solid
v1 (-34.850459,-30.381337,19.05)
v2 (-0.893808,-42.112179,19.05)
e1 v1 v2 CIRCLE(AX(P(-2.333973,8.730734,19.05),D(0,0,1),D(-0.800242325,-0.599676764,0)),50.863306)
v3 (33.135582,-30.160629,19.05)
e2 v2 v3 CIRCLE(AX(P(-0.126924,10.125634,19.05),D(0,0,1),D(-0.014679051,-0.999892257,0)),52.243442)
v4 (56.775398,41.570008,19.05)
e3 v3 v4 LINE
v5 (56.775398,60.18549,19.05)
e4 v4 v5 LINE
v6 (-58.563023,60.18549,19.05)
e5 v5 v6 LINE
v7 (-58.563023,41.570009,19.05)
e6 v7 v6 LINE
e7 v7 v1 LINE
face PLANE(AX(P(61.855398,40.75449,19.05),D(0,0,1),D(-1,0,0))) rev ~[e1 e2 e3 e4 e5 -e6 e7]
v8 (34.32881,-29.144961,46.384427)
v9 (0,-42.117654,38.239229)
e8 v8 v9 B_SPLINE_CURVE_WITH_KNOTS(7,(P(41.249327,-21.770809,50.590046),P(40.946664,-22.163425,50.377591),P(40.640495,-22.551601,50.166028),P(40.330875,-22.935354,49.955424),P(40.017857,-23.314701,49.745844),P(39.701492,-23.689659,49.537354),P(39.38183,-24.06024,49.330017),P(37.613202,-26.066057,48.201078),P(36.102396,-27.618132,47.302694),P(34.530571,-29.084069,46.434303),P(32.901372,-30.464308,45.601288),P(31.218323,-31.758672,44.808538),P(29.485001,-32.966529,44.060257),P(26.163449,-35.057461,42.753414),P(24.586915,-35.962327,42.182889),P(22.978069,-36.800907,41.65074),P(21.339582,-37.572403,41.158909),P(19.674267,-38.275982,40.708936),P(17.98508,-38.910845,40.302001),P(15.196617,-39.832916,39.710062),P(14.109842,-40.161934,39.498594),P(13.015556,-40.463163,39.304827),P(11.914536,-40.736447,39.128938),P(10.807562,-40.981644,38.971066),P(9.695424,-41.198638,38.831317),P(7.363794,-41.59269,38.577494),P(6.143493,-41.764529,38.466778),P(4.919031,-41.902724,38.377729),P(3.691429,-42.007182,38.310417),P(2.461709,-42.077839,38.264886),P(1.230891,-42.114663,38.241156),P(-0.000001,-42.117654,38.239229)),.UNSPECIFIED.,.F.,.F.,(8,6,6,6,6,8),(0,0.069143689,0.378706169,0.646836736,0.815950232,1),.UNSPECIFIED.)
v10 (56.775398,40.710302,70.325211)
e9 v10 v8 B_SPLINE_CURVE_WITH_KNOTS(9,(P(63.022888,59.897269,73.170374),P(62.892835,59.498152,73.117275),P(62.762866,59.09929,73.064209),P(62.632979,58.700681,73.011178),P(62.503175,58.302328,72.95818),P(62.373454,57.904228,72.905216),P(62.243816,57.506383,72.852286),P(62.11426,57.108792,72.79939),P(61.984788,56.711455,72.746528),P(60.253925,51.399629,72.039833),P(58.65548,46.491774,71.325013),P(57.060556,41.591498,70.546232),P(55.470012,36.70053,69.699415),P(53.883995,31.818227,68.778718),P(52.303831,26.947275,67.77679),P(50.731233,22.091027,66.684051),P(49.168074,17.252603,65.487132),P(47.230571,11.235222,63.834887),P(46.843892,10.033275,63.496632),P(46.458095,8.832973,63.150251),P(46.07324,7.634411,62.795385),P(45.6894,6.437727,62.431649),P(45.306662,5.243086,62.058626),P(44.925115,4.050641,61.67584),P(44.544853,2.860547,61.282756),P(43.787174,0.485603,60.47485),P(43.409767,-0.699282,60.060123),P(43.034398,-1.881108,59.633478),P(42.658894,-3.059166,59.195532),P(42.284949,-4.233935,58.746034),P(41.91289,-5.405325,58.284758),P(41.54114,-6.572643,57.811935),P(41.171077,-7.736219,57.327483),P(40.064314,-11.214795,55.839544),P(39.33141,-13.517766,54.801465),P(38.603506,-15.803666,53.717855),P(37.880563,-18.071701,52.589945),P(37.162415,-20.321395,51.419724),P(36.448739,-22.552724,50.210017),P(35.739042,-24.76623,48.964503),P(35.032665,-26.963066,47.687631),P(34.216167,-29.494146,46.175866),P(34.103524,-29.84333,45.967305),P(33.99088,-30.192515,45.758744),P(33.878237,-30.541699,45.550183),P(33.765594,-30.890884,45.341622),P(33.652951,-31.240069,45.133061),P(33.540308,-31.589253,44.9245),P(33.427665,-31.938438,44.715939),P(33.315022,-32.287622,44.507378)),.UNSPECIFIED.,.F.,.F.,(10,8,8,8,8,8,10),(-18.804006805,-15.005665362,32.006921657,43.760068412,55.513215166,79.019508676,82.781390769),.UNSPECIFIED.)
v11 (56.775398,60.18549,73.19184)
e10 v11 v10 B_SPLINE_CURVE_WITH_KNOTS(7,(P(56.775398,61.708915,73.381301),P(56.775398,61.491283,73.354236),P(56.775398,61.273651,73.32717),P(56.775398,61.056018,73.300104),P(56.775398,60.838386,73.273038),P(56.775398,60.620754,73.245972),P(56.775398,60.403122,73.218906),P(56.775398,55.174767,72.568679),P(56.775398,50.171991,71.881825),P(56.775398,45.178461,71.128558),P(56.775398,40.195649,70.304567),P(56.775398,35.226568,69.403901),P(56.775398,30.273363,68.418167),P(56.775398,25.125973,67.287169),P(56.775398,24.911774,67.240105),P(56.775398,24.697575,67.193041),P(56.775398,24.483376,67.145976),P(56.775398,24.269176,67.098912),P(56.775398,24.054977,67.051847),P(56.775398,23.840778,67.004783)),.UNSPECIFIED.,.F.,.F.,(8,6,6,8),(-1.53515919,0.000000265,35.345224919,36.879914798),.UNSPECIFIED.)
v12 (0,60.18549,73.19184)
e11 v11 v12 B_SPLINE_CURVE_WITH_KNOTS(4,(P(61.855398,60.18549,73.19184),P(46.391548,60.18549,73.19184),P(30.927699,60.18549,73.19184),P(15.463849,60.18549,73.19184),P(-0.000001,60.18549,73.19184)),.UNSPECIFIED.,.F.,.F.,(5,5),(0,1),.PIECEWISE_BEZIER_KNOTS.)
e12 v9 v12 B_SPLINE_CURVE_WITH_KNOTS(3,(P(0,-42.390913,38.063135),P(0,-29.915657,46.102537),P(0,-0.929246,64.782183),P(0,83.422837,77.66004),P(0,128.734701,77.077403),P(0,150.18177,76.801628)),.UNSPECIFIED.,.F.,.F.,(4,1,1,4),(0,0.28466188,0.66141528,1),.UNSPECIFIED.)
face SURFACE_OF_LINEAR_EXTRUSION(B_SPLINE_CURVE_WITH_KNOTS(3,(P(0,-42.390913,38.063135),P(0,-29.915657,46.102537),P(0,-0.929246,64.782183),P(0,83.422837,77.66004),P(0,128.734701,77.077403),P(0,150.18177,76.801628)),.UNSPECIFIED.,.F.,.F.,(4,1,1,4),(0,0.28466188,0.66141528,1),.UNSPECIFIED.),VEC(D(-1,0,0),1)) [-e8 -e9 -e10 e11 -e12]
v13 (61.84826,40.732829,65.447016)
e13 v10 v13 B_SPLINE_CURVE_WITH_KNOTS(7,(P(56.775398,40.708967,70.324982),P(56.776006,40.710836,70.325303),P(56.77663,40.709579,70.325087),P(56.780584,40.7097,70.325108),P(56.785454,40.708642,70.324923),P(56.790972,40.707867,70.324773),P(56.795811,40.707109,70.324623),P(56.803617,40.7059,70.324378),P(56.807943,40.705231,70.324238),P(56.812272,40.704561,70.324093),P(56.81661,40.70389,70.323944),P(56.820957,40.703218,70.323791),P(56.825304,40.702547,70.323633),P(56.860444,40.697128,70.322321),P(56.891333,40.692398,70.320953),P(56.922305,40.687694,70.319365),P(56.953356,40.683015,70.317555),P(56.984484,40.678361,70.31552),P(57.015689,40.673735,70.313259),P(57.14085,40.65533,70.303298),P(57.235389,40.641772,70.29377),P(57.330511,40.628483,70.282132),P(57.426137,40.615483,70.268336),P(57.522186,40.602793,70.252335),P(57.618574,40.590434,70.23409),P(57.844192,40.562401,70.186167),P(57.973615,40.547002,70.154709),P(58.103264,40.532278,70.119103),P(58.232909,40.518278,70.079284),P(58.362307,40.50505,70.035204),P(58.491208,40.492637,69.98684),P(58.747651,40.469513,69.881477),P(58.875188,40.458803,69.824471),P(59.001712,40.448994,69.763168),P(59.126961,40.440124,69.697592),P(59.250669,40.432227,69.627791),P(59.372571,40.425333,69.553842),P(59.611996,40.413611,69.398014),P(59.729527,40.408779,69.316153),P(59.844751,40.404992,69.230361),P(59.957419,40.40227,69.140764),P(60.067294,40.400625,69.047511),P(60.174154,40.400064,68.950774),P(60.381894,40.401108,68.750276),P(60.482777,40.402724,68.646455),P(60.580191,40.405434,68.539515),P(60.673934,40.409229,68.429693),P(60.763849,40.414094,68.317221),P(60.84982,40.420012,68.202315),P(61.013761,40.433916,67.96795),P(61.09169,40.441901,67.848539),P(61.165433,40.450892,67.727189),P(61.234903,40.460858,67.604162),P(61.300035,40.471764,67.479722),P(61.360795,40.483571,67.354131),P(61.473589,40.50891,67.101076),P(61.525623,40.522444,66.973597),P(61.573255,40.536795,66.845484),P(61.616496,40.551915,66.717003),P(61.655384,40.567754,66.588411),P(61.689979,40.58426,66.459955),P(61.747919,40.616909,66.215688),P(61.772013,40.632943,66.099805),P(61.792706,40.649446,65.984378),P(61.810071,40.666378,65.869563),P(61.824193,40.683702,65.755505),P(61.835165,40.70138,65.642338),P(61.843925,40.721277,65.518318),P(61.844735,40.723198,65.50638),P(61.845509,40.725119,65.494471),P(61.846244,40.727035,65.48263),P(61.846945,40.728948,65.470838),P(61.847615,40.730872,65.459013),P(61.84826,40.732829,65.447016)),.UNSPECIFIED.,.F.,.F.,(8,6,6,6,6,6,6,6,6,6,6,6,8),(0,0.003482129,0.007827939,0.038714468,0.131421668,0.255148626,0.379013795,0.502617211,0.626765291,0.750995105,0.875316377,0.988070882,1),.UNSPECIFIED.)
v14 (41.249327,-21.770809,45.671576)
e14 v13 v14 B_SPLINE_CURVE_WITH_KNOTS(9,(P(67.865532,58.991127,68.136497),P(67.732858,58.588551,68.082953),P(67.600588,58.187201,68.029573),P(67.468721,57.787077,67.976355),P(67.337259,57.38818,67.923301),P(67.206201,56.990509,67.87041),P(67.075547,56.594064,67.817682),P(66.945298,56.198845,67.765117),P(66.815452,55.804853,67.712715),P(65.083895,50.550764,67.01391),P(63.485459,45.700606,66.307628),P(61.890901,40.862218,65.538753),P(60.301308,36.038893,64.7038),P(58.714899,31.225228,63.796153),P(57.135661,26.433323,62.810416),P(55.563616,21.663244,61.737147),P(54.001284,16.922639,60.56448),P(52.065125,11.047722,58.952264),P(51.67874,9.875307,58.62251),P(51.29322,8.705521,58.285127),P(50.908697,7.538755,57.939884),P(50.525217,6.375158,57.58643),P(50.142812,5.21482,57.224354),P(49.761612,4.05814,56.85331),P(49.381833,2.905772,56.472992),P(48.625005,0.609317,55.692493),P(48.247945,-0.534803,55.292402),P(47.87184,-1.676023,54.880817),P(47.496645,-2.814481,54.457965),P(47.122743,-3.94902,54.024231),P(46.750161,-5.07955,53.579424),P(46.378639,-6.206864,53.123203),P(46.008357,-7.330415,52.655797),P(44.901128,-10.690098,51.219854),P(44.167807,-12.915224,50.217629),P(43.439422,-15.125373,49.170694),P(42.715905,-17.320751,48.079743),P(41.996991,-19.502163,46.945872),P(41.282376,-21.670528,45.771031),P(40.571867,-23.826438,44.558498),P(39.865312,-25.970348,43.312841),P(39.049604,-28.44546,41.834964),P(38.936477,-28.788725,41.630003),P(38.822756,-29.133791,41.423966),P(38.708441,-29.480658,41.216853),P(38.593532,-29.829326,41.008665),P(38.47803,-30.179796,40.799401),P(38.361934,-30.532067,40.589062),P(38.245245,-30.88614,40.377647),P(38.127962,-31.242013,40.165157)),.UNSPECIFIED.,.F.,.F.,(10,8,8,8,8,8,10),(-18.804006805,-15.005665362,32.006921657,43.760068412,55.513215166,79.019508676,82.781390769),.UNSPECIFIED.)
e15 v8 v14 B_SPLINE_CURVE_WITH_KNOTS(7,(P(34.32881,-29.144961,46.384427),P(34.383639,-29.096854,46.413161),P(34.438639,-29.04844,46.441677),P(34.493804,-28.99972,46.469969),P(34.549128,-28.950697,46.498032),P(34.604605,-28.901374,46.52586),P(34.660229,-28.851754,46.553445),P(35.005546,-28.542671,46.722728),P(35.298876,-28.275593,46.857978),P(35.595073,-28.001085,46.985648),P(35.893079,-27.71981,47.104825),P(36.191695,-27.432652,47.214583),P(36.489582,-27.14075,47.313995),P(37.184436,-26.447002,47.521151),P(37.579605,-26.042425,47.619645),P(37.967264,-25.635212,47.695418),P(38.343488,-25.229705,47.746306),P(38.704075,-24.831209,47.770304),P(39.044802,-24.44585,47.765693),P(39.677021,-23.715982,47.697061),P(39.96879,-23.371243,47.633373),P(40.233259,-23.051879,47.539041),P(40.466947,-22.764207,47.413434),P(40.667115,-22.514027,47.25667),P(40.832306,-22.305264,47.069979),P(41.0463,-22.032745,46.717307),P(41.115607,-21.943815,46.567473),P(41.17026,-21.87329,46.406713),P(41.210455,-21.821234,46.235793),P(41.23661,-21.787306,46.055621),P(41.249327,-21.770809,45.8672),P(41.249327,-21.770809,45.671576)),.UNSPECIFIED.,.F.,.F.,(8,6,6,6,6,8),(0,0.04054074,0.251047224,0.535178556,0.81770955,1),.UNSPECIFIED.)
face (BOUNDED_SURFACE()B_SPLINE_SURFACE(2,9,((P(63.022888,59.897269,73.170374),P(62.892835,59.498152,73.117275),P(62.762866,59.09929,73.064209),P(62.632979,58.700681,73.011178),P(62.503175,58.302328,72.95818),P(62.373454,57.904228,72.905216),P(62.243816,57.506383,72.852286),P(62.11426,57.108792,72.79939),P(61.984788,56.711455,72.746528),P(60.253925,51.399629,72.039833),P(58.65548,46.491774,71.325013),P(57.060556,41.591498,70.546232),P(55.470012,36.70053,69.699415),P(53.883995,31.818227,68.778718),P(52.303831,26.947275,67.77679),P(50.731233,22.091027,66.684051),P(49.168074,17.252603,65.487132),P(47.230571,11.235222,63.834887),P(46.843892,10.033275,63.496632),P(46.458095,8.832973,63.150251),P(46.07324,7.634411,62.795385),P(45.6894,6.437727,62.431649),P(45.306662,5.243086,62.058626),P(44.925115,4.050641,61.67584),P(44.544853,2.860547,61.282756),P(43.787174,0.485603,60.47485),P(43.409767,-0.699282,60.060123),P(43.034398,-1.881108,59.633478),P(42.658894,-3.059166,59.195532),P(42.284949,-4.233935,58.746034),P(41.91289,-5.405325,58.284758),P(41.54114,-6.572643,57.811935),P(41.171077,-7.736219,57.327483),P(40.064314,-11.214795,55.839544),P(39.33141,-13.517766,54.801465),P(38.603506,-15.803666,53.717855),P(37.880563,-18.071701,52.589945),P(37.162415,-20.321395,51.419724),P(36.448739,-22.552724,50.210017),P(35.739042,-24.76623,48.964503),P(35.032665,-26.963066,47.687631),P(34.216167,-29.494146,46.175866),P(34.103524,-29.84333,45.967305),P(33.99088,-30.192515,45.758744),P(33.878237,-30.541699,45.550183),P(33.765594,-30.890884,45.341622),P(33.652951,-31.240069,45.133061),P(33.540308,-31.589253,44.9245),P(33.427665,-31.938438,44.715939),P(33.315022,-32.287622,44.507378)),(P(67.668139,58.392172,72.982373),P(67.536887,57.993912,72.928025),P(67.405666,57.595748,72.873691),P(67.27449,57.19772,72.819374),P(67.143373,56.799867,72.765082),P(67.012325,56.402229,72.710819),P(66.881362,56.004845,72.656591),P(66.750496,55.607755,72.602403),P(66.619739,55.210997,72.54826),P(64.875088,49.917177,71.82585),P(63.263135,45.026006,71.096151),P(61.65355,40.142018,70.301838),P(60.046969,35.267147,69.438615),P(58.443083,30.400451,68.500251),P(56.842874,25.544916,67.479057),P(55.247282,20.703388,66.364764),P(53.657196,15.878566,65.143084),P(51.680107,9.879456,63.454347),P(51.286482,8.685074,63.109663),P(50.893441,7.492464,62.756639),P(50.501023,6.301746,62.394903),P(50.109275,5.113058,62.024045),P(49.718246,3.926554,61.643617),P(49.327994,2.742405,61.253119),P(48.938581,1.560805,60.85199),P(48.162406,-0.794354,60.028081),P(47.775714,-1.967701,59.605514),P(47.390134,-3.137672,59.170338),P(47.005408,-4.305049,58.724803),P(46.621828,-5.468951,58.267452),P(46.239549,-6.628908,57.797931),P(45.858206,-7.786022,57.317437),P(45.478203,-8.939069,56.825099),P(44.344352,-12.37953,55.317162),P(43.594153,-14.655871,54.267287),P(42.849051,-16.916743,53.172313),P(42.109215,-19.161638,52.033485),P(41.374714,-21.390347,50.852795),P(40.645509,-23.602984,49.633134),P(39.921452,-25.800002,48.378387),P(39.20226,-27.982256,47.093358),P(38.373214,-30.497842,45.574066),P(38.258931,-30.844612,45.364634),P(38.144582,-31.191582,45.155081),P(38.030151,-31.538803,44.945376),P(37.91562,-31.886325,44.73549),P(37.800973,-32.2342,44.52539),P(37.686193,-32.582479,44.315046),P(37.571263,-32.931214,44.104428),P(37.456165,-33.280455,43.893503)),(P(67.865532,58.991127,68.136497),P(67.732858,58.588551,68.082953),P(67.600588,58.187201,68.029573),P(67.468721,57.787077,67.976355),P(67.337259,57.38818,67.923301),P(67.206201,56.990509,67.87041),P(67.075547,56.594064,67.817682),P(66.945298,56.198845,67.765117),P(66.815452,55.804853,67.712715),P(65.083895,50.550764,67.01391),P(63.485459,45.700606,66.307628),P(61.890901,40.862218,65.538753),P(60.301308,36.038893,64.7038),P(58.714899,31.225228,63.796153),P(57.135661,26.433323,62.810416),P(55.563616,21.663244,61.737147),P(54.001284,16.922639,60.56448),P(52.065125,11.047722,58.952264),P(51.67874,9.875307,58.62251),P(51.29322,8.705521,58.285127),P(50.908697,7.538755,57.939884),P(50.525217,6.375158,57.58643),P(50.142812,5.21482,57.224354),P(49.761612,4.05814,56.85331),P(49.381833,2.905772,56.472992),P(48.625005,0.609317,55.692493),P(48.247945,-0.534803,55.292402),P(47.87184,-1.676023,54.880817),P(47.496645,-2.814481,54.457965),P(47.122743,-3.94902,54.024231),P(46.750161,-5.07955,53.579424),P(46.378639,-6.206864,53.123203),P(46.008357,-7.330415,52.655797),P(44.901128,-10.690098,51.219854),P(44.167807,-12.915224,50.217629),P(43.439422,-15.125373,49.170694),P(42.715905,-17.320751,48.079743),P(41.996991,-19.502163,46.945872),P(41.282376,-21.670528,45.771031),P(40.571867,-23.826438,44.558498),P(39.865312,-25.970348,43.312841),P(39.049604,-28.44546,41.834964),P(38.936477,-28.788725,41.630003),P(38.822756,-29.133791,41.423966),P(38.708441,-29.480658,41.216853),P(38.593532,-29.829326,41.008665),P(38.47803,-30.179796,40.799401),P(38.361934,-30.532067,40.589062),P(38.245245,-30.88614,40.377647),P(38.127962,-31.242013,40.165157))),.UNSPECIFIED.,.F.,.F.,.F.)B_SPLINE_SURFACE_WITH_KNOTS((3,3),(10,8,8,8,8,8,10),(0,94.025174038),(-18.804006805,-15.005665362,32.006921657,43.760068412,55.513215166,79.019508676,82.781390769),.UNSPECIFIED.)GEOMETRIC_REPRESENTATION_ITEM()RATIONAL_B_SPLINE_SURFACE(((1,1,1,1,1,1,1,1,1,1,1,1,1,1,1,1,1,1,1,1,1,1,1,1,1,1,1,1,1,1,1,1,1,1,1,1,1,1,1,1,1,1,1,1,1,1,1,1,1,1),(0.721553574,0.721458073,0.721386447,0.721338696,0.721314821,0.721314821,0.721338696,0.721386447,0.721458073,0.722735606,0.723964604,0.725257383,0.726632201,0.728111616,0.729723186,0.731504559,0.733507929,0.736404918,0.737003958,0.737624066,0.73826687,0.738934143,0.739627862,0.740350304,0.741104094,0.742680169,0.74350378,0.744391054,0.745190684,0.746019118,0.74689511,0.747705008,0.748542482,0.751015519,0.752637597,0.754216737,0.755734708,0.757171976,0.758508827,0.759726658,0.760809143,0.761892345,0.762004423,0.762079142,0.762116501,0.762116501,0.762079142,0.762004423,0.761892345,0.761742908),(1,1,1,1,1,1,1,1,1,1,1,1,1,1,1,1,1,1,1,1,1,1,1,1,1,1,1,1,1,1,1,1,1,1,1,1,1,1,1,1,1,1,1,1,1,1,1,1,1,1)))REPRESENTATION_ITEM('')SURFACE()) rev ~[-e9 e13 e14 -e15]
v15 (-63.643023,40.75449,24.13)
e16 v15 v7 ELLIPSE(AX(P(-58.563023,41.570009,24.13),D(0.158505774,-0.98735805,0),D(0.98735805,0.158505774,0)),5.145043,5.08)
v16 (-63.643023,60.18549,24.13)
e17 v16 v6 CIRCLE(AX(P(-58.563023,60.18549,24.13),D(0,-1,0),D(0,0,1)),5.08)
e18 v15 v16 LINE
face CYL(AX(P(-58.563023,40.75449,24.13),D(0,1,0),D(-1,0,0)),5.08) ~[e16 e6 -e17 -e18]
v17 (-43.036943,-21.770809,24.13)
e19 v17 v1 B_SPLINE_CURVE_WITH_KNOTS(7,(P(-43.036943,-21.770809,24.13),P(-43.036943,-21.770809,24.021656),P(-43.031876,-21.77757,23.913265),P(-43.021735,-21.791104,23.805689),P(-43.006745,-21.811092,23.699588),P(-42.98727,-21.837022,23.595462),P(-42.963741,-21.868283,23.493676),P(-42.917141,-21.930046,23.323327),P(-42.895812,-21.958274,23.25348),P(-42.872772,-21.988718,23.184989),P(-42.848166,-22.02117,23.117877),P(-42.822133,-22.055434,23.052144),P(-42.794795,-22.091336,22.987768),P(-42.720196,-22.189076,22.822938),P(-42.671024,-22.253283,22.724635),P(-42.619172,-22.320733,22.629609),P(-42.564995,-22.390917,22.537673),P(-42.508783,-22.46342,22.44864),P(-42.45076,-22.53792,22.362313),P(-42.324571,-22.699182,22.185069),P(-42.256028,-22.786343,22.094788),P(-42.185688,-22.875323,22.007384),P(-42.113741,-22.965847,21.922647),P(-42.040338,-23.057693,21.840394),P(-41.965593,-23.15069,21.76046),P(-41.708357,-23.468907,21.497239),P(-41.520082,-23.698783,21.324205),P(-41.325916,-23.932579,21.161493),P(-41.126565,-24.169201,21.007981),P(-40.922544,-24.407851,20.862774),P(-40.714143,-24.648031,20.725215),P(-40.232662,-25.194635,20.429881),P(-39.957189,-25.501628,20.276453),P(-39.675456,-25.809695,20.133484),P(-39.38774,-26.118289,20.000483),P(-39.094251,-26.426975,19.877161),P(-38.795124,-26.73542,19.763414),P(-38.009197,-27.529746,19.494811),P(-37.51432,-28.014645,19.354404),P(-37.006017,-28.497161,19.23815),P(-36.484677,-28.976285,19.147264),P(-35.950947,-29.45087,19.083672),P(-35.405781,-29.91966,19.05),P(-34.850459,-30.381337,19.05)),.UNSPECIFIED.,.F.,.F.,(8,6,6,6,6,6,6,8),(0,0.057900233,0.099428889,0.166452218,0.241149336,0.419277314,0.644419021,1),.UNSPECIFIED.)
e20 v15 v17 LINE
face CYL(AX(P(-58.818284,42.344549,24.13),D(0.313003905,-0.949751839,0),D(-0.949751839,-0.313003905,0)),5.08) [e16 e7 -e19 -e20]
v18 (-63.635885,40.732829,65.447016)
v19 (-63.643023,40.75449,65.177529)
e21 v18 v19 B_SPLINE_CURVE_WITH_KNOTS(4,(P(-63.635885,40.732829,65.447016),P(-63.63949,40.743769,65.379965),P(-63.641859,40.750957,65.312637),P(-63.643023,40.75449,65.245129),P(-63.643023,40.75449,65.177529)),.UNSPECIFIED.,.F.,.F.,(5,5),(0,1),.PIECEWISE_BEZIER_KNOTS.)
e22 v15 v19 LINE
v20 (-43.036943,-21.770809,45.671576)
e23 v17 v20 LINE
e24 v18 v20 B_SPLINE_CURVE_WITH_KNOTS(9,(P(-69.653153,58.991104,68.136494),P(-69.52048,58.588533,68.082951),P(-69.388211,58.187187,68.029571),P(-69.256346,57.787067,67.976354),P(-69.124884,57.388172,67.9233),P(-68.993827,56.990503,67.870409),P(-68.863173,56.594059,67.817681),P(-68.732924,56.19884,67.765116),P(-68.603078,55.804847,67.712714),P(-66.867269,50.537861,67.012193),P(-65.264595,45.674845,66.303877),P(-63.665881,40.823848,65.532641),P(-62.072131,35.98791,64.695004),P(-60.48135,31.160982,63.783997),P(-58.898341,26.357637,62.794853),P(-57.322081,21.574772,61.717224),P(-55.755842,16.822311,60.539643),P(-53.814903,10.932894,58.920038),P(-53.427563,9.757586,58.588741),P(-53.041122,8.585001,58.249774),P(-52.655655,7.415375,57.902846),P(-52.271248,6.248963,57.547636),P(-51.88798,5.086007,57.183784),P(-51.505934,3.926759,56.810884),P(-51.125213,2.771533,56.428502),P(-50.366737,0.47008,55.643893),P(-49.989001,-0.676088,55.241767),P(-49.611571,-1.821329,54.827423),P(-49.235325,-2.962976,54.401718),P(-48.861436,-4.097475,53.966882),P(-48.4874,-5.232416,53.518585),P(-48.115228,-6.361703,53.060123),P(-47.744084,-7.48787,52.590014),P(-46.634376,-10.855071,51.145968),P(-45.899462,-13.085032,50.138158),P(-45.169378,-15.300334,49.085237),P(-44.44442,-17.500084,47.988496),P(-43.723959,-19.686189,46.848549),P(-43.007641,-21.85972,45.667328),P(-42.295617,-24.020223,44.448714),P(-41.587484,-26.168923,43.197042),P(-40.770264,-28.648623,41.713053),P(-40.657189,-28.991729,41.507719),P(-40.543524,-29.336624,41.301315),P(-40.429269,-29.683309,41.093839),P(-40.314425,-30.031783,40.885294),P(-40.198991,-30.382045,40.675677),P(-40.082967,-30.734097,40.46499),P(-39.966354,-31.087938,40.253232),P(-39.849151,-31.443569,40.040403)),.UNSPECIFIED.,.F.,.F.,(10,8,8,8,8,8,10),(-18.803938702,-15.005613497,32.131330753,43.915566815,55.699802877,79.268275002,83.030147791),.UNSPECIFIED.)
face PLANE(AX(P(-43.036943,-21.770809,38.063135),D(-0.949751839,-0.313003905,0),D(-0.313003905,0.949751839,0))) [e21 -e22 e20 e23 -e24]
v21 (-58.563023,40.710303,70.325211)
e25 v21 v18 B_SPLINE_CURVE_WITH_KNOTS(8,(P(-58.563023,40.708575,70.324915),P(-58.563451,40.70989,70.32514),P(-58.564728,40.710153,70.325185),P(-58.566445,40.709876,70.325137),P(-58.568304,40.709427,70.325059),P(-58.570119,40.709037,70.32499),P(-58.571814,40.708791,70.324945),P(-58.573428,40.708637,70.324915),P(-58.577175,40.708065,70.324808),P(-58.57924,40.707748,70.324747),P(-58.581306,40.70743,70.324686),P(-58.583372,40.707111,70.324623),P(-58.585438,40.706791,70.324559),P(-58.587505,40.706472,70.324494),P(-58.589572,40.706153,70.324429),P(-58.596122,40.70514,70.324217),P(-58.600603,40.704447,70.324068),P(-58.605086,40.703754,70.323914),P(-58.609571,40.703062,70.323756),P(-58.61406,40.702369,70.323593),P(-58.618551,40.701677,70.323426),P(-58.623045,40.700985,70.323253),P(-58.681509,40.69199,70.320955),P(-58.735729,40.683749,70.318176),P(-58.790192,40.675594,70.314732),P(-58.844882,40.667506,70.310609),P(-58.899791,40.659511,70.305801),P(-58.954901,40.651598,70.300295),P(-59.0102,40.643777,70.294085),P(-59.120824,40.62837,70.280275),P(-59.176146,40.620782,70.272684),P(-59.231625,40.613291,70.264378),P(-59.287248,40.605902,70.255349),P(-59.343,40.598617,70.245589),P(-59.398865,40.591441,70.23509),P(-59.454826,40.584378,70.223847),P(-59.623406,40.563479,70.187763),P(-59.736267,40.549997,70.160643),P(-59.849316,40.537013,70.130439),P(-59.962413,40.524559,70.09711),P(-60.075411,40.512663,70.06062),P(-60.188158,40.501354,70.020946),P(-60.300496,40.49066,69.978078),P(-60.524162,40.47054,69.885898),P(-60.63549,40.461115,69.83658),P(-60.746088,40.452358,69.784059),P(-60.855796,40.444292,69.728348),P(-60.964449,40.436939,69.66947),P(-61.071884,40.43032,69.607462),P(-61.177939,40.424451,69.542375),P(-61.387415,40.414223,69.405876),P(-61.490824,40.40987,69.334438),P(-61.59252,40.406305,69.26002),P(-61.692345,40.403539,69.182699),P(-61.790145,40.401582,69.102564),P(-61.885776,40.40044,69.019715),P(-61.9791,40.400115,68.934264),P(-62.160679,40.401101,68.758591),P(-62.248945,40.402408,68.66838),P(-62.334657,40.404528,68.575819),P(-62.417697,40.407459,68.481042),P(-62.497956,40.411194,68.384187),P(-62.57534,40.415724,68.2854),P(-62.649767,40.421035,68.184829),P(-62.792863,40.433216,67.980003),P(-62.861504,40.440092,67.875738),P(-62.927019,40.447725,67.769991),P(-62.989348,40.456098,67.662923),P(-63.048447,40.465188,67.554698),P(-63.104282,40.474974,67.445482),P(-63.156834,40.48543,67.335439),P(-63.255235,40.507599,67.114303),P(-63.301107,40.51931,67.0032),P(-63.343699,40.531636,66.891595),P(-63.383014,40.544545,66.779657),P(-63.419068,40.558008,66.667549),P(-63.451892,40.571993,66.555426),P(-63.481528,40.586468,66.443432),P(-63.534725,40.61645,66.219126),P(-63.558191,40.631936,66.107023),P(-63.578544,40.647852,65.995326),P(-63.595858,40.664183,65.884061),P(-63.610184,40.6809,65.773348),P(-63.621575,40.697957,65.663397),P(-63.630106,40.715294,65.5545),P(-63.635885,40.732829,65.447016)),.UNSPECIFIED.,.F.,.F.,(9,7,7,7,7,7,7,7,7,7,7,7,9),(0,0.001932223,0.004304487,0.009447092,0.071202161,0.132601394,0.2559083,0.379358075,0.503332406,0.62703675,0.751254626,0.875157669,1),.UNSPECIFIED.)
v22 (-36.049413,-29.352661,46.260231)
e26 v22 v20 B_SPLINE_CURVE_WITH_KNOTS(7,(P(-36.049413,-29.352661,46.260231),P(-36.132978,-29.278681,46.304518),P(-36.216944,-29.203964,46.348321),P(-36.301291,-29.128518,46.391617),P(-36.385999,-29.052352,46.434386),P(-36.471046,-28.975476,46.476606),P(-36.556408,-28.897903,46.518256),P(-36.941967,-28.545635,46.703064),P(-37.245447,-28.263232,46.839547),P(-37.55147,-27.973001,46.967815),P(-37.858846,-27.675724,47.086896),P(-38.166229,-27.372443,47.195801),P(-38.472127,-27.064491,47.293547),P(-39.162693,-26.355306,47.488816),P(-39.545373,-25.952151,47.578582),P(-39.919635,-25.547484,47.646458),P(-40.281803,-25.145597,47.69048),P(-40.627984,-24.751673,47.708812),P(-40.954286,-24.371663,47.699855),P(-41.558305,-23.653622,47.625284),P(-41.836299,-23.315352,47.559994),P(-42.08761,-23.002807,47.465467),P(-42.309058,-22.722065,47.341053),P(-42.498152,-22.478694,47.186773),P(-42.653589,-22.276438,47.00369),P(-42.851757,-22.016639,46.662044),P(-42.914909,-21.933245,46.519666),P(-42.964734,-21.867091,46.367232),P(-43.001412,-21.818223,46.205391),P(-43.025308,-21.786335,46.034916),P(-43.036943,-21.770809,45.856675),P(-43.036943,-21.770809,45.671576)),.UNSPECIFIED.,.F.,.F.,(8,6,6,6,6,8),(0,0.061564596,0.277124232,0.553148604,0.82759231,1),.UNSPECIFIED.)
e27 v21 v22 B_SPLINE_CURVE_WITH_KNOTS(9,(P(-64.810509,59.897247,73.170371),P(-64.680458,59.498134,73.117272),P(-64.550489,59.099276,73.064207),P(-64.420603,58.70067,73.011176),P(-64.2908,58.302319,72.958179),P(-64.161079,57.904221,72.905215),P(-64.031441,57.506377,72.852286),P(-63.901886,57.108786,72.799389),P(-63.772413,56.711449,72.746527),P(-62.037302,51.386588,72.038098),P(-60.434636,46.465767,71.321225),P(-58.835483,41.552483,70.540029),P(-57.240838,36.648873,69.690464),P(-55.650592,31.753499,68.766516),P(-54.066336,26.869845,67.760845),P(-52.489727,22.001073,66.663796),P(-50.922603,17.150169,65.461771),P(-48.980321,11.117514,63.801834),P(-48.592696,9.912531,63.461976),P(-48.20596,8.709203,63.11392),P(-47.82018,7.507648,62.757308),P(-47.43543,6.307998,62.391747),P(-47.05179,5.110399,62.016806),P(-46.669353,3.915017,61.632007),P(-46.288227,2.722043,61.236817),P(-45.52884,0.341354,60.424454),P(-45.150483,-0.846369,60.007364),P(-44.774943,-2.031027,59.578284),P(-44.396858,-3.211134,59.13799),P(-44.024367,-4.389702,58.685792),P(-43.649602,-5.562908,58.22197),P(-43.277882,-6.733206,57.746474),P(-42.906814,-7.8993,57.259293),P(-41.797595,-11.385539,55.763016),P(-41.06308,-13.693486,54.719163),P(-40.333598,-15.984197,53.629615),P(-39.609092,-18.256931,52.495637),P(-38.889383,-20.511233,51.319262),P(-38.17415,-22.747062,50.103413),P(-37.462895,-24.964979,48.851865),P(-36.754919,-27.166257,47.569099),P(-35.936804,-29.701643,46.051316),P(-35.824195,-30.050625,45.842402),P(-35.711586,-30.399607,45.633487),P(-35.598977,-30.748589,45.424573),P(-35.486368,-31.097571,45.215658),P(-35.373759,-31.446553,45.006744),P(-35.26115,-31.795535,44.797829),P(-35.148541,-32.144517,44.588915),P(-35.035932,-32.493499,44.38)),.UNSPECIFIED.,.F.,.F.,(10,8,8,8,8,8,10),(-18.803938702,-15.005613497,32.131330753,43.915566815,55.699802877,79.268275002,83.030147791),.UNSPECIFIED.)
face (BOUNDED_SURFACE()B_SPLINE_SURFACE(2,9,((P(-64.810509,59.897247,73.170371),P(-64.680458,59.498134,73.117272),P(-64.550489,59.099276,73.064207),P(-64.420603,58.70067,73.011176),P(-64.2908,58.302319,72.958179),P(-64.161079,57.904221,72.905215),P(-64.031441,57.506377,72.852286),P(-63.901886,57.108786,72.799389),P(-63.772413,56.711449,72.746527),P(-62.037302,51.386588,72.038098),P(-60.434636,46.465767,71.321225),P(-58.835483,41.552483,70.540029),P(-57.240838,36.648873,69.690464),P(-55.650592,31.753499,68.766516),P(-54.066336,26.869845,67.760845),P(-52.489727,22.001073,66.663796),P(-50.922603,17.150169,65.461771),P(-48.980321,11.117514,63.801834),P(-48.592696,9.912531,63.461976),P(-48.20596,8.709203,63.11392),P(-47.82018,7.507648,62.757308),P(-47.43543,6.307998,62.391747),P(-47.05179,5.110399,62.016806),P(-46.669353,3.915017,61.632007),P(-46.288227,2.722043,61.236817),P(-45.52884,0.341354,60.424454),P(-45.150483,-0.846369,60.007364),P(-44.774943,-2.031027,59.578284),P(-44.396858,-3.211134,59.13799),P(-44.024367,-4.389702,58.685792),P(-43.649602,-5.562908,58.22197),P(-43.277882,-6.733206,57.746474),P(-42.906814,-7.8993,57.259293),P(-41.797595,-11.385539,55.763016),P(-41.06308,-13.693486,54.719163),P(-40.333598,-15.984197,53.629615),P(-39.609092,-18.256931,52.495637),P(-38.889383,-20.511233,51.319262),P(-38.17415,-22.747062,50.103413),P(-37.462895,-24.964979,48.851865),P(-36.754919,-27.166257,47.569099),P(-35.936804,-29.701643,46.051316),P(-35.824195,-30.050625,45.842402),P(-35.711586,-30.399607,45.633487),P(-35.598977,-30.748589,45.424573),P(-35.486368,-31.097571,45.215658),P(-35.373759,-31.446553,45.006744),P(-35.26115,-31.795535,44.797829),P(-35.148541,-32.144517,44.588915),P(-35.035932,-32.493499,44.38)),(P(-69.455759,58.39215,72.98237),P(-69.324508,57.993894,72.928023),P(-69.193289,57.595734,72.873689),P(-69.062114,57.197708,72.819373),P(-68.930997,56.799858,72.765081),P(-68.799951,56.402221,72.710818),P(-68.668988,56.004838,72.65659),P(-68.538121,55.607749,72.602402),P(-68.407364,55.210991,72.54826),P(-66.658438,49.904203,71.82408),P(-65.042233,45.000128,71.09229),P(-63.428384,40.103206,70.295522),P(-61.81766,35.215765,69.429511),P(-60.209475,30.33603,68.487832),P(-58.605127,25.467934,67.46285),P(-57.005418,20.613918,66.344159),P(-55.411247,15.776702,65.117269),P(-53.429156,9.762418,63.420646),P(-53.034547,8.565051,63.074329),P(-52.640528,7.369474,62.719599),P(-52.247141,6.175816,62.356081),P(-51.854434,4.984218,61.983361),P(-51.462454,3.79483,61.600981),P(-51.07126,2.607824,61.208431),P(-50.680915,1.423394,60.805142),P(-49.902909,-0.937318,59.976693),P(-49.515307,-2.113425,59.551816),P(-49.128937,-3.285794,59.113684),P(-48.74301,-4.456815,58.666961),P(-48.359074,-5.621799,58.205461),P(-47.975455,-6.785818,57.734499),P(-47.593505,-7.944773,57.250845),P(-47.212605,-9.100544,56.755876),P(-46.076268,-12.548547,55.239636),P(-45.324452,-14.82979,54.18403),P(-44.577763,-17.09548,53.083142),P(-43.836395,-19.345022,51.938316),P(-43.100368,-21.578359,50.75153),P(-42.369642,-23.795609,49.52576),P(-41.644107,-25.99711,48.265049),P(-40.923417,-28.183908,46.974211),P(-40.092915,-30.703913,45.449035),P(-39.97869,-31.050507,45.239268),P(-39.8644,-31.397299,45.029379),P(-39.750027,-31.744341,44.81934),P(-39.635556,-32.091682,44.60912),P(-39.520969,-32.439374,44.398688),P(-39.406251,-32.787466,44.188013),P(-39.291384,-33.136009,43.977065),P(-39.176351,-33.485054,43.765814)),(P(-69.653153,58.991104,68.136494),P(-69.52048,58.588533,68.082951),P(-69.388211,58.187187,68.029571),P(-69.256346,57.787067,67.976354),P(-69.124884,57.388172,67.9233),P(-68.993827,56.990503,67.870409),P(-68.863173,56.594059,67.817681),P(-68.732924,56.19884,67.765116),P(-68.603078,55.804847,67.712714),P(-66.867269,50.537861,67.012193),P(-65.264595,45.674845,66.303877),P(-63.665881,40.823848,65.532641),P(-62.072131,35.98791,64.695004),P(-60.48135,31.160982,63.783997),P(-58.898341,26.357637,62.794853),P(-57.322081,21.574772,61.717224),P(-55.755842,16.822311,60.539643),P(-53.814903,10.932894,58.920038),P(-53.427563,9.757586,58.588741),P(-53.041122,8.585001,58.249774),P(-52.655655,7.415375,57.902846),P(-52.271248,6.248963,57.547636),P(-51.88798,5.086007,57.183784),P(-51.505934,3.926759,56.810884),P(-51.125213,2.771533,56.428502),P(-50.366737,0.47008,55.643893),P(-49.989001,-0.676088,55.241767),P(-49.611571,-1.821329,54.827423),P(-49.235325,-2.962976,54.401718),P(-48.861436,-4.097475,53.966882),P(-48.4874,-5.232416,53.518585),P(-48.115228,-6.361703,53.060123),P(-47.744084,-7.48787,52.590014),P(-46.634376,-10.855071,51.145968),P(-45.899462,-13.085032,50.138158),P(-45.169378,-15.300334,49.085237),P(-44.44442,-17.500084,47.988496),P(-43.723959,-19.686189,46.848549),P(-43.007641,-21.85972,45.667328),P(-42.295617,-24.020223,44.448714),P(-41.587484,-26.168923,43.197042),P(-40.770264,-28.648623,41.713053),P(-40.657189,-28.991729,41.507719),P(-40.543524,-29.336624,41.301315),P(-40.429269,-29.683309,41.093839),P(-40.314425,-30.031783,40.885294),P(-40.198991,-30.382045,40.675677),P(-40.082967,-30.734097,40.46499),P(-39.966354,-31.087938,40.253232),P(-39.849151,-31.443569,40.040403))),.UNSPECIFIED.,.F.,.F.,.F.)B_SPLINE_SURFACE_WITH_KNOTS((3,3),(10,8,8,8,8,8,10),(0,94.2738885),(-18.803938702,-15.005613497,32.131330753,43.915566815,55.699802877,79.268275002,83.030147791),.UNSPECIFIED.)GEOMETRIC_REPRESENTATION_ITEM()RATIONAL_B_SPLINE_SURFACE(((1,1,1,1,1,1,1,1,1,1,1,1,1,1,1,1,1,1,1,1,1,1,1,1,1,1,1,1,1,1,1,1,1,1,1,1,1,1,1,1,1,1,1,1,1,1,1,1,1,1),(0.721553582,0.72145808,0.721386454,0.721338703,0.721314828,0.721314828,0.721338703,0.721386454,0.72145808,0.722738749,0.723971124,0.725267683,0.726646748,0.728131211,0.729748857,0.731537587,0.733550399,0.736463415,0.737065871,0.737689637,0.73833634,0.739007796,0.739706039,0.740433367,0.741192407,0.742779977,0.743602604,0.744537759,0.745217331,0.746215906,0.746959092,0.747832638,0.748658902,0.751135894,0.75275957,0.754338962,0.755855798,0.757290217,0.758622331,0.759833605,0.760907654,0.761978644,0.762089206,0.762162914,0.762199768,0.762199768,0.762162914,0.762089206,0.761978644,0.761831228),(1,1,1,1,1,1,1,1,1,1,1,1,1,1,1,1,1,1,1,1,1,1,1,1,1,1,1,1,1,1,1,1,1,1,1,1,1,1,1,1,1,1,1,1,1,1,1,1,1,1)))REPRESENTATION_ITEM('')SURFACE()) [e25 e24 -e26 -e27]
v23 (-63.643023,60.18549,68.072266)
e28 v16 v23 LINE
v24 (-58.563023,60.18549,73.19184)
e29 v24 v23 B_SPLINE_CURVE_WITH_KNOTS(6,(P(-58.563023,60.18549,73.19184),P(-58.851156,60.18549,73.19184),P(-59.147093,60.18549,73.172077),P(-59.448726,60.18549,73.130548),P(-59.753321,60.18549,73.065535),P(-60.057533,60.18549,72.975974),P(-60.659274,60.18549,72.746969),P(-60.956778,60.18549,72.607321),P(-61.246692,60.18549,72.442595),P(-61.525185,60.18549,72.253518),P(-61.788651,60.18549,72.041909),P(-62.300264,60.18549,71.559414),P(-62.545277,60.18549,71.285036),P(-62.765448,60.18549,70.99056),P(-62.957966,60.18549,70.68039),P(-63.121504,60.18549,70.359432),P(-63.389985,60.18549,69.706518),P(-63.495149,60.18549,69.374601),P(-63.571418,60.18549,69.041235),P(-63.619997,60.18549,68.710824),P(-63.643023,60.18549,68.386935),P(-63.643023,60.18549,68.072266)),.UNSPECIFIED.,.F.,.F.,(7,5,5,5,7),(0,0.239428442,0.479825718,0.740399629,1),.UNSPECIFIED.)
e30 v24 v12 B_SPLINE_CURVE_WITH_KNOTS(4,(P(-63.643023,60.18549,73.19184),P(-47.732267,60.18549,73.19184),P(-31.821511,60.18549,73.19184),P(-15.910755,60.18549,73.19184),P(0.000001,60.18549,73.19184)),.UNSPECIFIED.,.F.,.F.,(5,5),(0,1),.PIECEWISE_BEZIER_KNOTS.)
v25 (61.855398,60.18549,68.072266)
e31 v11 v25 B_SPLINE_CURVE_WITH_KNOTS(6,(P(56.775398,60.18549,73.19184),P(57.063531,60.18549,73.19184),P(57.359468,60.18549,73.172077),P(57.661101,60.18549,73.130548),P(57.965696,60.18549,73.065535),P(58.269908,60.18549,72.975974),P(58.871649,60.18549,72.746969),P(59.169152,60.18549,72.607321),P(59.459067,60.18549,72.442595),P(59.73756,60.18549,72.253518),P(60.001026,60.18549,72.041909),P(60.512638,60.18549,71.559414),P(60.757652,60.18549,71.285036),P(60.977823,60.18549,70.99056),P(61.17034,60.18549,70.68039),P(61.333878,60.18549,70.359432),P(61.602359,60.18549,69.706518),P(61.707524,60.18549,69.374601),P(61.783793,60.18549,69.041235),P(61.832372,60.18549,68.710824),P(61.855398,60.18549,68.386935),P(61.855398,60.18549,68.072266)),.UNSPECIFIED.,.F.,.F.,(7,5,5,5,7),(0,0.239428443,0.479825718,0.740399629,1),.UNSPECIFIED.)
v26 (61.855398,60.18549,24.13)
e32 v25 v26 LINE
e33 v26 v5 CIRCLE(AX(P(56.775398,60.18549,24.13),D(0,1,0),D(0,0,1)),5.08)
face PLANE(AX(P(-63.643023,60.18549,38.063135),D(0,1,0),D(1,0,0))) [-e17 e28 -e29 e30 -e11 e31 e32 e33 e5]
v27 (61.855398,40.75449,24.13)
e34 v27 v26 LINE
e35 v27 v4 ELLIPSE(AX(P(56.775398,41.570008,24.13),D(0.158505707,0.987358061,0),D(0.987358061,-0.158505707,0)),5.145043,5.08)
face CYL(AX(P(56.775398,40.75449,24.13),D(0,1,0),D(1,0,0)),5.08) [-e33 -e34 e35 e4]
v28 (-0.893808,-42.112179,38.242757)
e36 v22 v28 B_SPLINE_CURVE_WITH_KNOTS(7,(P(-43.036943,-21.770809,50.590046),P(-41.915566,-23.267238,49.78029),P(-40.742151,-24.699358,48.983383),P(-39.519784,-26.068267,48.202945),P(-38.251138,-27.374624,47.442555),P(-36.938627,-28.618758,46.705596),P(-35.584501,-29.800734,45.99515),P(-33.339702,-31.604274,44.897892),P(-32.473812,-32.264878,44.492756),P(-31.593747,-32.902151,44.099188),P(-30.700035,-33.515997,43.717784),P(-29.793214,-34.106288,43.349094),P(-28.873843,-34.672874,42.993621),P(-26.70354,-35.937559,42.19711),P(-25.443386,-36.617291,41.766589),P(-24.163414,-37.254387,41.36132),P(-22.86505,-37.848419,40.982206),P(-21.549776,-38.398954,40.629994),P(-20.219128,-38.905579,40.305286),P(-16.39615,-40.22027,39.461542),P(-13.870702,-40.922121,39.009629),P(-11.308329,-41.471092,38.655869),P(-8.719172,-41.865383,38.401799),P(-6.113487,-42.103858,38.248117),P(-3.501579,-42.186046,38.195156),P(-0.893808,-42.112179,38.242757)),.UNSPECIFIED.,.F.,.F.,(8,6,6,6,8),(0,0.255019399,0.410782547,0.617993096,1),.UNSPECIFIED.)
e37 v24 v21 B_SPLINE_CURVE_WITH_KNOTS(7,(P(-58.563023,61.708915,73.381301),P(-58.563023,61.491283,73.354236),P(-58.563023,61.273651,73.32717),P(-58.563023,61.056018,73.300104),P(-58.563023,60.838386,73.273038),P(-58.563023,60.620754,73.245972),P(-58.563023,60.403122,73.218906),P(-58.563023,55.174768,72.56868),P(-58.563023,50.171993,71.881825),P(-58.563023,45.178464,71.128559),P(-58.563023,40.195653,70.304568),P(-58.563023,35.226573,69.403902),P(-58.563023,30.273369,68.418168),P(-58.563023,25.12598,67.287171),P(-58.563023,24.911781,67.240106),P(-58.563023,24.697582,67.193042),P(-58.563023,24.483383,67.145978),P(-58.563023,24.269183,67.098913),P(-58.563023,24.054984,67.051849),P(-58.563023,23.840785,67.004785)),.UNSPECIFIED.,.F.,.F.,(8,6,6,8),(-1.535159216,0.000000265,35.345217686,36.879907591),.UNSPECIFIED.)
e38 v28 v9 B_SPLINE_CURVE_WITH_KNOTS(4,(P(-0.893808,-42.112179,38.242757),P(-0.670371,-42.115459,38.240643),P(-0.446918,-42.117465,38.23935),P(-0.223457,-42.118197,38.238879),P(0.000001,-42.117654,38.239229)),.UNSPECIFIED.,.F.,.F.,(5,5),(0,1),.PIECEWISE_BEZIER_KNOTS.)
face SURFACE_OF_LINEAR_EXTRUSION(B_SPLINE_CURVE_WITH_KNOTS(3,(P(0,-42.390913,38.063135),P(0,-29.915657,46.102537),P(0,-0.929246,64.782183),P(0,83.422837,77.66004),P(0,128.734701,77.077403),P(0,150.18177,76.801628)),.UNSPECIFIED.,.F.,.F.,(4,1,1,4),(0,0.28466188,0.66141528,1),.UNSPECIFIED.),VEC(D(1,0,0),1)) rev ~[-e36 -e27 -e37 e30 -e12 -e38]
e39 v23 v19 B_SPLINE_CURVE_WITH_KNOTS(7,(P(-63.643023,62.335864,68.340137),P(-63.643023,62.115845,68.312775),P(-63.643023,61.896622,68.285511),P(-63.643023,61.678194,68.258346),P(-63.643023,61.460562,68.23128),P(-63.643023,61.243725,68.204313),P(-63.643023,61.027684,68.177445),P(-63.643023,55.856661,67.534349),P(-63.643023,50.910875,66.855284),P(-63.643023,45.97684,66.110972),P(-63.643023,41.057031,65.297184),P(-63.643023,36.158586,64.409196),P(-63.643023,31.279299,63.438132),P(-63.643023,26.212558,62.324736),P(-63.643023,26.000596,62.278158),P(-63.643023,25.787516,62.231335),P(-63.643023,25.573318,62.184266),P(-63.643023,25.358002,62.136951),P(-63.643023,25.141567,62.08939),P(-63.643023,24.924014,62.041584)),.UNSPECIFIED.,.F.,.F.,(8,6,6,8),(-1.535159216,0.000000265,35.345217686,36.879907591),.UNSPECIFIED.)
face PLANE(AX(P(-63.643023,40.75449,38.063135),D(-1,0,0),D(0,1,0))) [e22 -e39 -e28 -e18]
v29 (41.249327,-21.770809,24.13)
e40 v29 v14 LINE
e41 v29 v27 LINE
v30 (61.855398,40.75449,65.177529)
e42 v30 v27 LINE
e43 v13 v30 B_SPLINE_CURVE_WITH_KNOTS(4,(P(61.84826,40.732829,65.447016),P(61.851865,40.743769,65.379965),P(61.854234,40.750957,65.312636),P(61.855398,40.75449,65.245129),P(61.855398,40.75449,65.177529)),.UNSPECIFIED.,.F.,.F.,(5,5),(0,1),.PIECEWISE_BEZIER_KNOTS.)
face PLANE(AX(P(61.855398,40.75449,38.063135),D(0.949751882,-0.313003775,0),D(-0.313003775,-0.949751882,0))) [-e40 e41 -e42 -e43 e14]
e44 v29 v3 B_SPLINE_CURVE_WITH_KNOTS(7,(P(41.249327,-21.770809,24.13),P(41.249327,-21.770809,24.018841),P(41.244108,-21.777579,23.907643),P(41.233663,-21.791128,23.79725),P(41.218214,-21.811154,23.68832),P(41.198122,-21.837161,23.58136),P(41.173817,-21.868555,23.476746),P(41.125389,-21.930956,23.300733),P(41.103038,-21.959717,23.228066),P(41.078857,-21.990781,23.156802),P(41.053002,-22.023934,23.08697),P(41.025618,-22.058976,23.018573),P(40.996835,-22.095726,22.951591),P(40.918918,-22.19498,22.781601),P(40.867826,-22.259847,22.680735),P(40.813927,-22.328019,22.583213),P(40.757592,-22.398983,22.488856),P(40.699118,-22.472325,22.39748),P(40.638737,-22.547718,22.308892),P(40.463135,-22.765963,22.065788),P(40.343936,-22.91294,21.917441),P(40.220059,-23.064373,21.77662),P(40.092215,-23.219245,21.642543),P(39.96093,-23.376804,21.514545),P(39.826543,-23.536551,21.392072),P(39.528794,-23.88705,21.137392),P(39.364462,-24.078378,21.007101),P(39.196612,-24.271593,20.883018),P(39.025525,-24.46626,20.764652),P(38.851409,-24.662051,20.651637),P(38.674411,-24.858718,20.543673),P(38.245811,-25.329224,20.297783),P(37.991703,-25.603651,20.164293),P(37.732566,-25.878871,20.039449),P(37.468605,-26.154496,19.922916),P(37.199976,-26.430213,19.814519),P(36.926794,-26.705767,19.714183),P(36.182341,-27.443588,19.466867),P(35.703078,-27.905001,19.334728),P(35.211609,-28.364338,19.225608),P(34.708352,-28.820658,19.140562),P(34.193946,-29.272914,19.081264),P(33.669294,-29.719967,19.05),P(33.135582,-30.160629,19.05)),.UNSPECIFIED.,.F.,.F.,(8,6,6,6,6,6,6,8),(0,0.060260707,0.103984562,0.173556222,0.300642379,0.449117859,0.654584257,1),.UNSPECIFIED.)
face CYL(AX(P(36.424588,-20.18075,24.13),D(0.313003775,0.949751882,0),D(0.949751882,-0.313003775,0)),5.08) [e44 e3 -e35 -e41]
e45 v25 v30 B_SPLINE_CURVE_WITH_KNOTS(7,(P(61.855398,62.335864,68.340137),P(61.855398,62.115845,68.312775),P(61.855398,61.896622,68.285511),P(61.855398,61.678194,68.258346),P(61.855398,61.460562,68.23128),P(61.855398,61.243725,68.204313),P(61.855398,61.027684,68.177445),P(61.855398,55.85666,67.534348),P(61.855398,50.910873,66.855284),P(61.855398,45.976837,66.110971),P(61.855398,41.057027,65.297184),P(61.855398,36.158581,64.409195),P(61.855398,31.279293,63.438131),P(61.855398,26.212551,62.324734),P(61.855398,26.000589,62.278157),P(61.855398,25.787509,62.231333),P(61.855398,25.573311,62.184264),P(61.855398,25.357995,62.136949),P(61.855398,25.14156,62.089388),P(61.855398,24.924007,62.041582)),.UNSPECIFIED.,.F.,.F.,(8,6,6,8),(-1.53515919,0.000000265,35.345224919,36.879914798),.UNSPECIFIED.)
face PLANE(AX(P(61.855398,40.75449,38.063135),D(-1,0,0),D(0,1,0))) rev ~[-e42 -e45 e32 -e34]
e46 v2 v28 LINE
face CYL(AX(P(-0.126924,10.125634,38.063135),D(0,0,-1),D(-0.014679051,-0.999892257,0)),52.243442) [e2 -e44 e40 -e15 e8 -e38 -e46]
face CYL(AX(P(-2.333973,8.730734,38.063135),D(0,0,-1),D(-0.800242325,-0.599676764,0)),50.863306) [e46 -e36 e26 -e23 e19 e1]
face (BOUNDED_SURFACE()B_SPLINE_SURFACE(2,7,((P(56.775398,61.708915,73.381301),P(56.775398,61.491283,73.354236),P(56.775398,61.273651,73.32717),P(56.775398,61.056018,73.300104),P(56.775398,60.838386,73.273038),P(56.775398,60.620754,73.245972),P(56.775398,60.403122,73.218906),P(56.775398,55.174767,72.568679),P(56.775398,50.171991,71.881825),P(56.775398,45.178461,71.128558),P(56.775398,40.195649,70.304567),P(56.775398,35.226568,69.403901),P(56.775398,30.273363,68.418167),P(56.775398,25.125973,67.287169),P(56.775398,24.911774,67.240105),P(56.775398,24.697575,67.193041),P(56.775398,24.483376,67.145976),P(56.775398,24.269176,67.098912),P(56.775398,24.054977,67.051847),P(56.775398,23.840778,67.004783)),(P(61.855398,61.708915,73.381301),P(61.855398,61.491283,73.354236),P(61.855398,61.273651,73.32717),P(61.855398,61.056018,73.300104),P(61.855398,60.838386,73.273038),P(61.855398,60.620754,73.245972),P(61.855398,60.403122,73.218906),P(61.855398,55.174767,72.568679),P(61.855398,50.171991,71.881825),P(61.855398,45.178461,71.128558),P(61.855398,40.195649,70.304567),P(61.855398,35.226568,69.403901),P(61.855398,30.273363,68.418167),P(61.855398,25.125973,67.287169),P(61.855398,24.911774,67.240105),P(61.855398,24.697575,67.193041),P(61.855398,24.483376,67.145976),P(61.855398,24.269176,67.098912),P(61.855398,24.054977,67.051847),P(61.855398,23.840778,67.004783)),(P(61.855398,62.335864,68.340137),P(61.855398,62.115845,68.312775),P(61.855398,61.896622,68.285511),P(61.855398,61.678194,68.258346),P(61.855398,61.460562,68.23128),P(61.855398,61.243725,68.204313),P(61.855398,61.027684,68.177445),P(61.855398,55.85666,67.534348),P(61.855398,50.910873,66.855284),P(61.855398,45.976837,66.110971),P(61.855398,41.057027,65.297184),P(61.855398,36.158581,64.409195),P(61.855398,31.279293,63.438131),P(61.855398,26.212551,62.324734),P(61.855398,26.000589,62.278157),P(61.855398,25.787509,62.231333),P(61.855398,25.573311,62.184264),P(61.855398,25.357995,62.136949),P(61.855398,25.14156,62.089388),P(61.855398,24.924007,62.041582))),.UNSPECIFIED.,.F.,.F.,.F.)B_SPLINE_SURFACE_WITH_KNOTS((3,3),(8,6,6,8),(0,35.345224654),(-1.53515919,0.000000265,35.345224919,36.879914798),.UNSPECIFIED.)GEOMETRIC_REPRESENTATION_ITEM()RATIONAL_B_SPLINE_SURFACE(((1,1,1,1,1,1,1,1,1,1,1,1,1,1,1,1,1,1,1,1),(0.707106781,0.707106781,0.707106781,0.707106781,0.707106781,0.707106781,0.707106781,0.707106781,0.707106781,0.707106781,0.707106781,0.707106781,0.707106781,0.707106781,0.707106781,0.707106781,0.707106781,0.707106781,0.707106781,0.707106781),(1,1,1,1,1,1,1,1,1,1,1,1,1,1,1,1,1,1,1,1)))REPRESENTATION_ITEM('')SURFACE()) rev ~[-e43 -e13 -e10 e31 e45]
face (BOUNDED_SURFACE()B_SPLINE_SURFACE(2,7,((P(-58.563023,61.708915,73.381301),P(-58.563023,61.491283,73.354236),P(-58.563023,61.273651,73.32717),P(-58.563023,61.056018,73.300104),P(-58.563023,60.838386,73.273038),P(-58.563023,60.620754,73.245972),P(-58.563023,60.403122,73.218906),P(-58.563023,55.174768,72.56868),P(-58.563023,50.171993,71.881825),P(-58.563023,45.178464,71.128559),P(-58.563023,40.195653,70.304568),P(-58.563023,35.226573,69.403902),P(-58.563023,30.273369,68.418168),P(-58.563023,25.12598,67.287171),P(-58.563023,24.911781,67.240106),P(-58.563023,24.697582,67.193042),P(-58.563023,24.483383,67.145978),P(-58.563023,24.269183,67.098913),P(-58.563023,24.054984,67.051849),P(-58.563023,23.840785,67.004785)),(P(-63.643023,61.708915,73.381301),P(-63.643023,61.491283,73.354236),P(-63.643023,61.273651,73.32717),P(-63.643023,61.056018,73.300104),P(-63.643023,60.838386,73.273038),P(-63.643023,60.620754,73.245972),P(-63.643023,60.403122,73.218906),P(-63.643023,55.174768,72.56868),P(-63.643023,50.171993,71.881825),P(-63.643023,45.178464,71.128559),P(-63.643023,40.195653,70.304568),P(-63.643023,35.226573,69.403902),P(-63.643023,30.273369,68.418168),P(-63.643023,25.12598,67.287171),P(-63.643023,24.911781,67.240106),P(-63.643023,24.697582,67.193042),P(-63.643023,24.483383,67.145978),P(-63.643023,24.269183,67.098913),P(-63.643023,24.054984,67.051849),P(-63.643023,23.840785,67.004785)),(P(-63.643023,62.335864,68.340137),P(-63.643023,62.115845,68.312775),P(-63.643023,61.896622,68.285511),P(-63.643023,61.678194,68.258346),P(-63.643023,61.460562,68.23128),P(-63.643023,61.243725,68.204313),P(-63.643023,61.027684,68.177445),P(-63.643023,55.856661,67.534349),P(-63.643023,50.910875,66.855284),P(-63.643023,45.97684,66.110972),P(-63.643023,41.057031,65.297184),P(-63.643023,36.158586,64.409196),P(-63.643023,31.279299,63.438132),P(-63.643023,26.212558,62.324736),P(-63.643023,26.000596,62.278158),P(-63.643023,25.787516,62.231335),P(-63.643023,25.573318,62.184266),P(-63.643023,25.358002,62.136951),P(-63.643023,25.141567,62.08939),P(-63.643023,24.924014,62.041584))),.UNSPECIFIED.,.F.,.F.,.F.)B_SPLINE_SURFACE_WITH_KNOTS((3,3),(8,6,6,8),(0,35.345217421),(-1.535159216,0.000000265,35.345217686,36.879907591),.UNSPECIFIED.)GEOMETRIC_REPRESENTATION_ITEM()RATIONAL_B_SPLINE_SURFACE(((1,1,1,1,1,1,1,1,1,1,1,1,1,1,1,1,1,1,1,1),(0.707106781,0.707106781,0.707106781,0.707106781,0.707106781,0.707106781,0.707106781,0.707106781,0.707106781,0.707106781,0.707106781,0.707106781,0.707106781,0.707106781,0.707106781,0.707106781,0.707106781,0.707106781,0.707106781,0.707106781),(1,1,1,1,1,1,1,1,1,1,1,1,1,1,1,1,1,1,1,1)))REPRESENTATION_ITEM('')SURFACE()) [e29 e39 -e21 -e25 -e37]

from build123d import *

# Parameters (mm, degrees)
F0_W     = 84.2862705333
F0_H     = 62.5252984464
F1_DEPTH = 38.1
F2_DEPTH = 19.431
F4_DEPTH = 76.2
F5_DEPTH = 50.8
F6_DEPTH = 19.05
F7_R     = 5.08


with BuildPart() as f1:
    # F0 (on Top) → F1 (new body)
    with BuildSketch(Plane.XY):
        with Locations((-0.8938079051, 9.4918403774)):
            Rectangle(F0_W, F0_H)
        Polygon((61.8553981185, 40.7544896007), (41.2493273616, 40.7544896007), (41.2493273616, -21.7708088458), align=None)
        Polygon((-43.0369431717, -21.7708088458), (-43.0369431717, 40.7544896007), (-63.6430233717, 40.7544896007), align=None)
        with BuildLine():
            Line((41.2493273616, -21.7708088458), (-43.0369431717, -21.7708088458))
            ThreePointArc((-43.0369431717, -21.7708088458), (-24.4435818385, -37.0758276989), (-0.8938079051, -42.1121791005))
            ThreePointArc((-0.8938079051, -42.1121791005), (22.5826118494, -36.9238529276), (41.2493273616, -21.7708088458))
        make_face()
    extrude(amount=F1_DEPTH)

    # F2 (add): a face of the model
    f2_faces = [f1.faces().sort_by_distance(p)[0] for p in [
        (-0.8938126266, 40.7544896007, 19.05),
    ]]
    extrude(f2_faces, amount=F2_DEPTH)

    # F3 (on Right) → F4 (join, symmetric)
    with BuildSketch(Plane.YZ):
        with BuildLine():
            add(Edge.make_bspline(
                [(-42.3909127712, 38.0631349981), (-29.9156566507, 46.1025365559), (-0.9292461645, 64.7821826505), (83.4228372852, 77.6600402112), (128.7347014113, 77.0774025905), (150.1817703247, 76.8016278744)],
                knots=[0, 0, 0, 0, 0.2846618796, 0.6614152802, 1, 1, 1, 1], degree=3))
            Line((-42.3909127712, 38.0631349981), (150.1817703247, 38.0631349981))
            Line((150.1817703247, 38.0631349981), (150.1817703247, 76.8016278744))
        make_face()
    extrude(amount=F4_DEPTH, both=True)

    # F5 (cut): a face of the model
    f5_faces = [f1.faces().sort_by_distance(p)[0] for p in [
        (0.4832953146, 74.166117784, 38.0631349981),
    ]]
    extrude(f5_faces, amount=-F5_DEPTH, mode=Mode.SUBTRACT)

    # F6 (cut): a face of the model
    f6_faces = [f1.faces().sort_by_distance(p)[0] for p in [
        (-0.9060877903, 15.8917005053, 0),
    ]]
    extrude(f6_faces, amount=-F6_DEPTH, mode=Mode.SUBTRACT)

    # F7
    f7_edges = [f1.edges().sort_by_distance(p)[0] for p in [
        (-53.339983, 9.49184, 19.05),
        (51.552363, 9.49184, 19.05),
        (51.296645, 8.715914, 63.106757),
        (0, 6.644686, 62.484239),
        (61.855398, 50.46999, 19.05),
        (-63.643023, 50.46999, 19.05),
        (61.855398, 50.453515, 71.874141),
        (-63.643023, 50.453515, 71.874141),
        (-53.105319, 8.779795, 63.12556),
    ]]
    fillet(f7_edges, radius=F7_R)


solid = f1.part
